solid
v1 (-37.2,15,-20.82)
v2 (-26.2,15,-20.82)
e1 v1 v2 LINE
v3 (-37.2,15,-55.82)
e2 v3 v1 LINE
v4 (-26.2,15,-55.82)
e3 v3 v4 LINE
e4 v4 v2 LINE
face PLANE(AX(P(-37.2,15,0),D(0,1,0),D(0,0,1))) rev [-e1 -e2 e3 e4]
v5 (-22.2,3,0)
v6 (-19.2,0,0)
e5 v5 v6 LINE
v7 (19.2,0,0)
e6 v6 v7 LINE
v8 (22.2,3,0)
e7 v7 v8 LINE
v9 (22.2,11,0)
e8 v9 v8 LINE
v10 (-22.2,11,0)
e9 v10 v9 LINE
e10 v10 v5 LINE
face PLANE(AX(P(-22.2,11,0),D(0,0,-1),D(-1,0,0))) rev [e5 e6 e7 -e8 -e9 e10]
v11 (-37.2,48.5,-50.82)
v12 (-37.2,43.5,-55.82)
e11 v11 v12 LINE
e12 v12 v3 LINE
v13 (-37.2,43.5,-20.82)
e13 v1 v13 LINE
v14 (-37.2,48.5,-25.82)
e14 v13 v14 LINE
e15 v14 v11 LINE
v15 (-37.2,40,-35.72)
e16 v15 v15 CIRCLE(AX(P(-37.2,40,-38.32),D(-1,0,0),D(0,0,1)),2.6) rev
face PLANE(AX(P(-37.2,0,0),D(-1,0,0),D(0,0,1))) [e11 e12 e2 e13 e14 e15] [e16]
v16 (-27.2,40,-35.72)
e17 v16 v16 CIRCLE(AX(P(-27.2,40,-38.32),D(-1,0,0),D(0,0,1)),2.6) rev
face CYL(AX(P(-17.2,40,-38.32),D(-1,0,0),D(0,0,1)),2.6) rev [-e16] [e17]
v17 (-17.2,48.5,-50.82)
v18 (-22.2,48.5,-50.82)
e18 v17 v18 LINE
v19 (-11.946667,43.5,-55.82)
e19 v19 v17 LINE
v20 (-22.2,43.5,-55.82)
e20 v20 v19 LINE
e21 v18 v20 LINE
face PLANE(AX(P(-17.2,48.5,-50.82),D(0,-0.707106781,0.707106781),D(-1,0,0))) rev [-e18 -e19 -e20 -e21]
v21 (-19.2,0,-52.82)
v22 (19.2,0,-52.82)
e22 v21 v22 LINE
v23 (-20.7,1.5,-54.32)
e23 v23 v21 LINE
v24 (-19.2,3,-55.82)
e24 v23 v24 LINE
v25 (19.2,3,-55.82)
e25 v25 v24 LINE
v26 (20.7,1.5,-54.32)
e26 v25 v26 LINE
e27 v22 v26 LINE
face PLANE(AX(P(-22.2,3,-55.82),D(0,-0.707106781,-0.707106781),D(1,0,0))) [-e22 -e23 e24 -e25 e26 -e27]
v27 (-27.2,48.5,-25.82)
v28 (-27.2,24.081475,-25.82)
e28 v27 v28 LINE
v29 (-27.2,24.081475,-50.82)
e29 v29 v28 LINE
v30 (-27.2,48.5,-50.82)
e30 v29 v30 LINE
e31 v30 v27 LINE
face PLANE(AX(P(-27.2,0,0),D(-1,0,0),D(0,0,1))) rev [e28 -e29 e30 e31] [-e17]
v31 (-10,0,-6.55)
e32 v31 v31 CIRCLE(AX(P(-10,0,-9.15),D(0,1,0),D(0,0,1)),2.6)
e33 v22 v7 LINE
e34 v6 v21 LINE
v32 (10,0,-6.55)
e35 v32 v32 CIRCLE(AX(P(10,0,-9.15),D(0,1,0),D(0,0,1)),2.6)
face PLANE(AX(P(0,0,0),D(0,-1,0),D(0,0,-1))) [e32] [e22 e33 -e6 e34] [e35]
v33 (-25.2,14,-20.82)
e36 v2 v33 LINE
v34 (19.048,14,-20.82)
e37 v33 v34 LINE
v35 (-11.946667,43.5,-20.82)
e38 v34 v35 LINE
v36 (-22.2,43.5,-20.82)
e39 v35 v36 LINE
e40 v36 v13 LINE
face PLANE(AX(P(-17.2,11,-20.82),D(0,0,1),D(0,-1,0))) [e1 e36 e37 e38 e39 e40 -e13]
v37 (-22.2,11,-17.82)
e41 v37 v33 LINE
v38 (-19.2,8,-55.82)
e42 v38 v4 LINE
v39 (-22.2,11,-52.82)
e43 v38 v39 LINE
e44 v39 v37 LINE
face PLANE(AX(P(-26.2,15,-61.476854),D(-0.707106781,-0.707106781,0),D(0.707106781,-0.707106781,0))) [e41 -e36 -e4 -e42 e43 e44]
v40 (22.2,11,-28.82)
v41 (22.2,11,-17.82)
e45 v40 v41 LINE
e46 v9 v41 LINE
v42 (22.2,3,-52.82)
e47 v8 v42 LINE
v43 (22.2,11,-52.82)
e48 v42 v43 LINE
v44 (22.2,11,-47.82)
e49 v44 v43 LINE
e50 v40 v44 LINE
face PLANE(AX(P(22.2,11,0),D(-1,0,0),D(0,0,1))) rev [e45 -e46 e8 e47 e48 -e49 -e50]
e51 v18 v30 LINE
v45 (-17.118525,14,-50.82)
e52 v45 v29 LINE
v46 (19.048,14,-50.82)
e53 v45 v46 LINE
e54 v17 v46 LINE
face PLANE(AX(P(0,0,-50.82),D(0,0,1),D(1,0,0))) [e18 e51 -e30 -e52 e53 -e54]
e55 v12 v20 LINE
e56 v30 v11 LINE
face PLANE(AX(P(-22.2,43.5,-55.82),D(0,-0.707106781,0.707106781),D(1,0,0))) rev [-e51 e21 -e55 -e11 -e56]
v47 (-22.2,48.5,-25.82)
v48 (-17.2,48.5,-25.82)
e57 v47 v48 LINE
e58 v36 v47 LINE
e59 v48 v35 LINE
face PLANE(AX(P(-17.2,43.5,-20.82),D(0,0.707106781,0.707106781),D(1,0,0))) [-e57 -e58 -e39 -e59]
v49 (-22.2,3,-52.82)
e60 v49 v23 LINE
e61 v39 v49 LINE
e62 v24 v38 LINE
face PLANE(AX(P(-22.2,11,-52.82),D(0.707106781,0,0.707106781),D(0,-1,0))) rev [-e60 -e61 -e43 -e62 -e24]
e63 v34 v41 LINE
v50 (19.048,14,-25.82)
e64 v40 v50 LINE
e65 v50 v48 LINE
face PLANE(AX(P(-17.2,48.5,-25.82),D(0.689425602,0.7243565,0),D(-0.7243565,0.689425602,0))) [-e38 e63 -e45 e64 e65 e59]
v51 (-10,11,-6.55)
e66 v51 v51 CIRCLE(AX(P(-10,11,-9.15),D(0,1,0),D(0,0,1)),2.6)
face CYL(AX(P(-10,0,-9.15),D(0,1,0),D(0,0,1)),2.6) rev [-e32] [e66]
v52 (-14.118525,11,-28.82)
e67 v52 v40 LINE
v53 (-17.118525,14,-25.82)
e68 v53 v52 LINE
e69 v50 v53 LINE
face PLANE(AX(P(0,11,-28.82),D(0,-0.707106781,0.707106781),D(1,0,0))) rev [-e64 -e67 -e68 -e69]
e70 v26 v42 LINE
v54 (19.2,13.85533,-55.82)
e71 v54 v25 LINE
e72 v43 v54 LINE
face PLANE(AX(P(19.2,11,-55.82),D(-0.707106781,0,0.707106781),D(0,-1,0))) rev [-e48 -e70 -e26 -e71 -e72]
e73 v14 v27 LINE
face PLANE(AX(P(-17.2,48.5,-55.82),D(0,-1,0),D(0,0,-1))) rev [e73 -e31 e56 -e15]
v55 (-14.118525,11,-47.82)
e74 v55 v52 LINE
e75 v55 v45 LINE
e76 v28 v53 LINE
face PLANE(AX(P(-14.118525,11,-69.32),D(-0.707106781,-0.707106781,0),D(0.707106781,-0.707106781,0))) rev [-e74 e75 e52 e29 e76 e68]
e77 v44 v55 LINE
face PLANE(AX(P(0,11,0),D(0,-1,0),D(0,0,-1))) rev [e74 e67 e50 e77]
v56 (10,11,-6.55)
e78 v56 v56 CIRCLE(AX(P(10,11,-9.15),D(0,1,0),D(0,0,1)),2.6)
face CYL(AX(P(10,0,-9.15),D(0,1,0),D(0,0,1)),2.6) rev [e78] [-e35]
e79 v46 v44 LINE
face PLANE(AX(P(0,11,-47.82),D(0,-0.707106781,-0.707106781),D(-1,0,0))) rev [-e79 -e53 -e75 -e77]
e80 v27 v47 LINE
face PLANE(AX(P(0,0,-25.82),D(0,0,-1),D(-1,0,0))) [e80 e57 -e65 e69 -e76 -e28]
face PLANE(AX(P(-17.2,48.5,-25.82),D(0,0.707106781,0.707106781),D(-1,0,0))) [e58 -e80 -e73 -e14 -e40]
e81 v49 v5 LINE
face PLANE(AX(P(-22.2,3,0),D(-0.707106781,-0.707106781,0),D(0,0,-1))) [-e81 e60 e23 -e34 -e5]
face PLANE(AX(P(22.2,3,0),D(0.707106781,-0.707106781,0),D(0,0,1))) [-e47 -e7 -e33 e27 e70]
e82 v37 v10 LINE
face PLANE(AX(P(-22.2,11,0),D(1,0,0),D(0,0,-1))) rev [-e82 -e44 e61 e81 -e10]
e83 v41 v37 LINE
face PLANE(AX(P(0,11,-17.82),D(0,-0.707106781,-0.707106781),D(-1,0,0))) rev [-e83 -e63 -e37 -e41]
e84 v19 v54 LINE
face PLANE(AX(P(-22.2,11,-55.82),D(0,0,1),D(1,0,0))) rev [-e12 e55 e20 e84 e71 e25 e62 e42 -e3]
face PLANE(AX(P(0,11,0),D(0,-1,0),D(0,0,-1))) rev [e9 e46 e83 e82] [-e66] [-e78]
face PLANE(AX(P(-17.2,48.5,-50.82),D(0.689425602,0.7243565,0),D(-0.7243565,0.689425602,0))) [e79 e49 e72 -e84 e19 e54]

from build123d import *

# Parameters (mm, degrees)
SKETCH2_W                = 44.4
SKETCH2_H                = 55.82
BOSS_EXTRUDE1_DEPTH      = 11
CHAMFER1_SIZE            = 3
SKETCH3_R                = 2.6
CUT_EXTRUDE1_DEPTH       = 62.071371362
SKETCH4_W                = 35
SKETCH4_H                = 37.5
SKETCH4_R                = 2.6
BOSS_EXTRUDE2_DEPTH      = 5
BOSS_EXTRUDE7_DEPTH      = 5
BOSS_EXTRUDE9_DEPTH      = 5
CHAMFER8_SIZE            = 5
BOSS_EXTRUDE11_OUTLINE_W = 35
BOSS_EXTRUDE11_OUTLINE_H = 33.5
BOSS_EXTRUDE11_OUTLINE_R = 2.6
BOSS_EXTRUDE11_DEPTH     = 15
CHAMFER10_SIZE           = 5
SKETCH13_W               = 25
SKETCH13_H               = 34.5
CUT_EXTRUDE2_DEPTH       = 10
BOSS_EXTRUDE12_REACH     = 72.435
BOSS_EXTRUDE13_DEPTH     = 25
CHAMFER11_SIZE           = 3


# Read off the part's stored shape, not the designer's step: Boss-Extrude11
# Some blends are built 0.0001 mm under size
with BuildPart() as part:
    # Sketch2 → Boss-Extrude1 (new body)
    with BuildSketch(Plane(origin=(0, 0, 0), x_dir=(1, 0, 0), z_dir=(0, 1, 0))):
        with Locations((0, 27.91)):
            Rectangle(SKETCH2_W, SKETCH2_H)
    extrude(amount=BOSS_EXTRUDE1_DEPTH)

    # Chamfer1
    chamfer1_edges = [part.edges().sort_by_distance(p)[0] for p in [
        (22.2, 0, -27.91),
        (-22.2, 0, -27.91),
    ]]
    chamfer(chamfer1_edges, length=CHAMFER1_SIZE)

    # Sketch3 → Cut-Extrude1 (cut, through all)
    with BuildSketch(Plane(origin=(0, 11, 0), x_dir=(1, 0, 0), z_dir=(0, 1, 0))):
        with Locations(Location((10, 9.15, 0), (0, 0, 270))):
            Circle(SKETCH3_R)
        with Locations(Location((-10, 9.15, 0), (0, 0, 270))):
            Circle(SKETCH3_R)
    extrude(amount=-CUT_EXTRUDE1_DEPTH, mode=Mode.SUBTRACT)

    # Sketch4 → Boss-Extrude2 (add)
    with BuildSketch(Plane.ZY.offset(22.2)):
        with Locations((-38.32, 29.75)):
            Rectangle(SKETCH4_W, SKETCH4_H)
        with Locations((-38.32, 40)):
            Circle(SKETCH4_R, mode=Mode.SUBTRACT)
    extrude(amount=-BOSS_EXTRUDE2_DEPTH)

    # Sketch8 → Boss-Extrude7 (add)
    with BuildSketch(Plane(origin=(0, 0, -55.82), x_dir=(-1, 0, 0), z_dir=(0, 0, -1))):
        Polygon((-22.2, 11), (22.2, 11), (22.2, 48.5), (17.2, 48.5), align=None)
    extrude(amount=-BOSS_EXTRUDE7_DEPTH)

    # Sketch9 → Boss-Extrude9 (add)
    with BuildSketch(Plane.XY.offset(-20.82)):
        Polygon((-22.2, 11), (-22.2, 48.5), (-17.2, 48.5), (22.2, 11), align=None)
    extrude(amount=-BOSS_EXTRUDE9_DEPTH)

    # Chamfer8
    chamfer8_edges = [part.edges().sort_by_distance(p)[0] for p in [
        (-19.7, 48.5, -20.82),
        (-19.7, 48.5, -55.82),
    ]]
    chamfer(chamfer8_edges, length=CHAMFER8_SIZE)

    # Boss-Extrude11 outline → Boss-Extrude11 (add)
    with BuildSketch(Plane.ZY.offset(22.2)):
        with Locations((-38.32, 31.75)):
            Rectangle(BOSS_EXTRUDE11_OUTLINE_W, BOSS_EXTRUDE11_OUTLINE_H)
        with Locations((-38.32, 40)):
            Circle(BOSS_EXTRUDE11_OUTLINE_R, mode=Mode.SUBTRACT)
    extrude(amount=BOSS_EXTRUDE11_DEPTH)

    # Chamfer10
    chamfer10_edges = [part.edges().sort_by_distance(p)[0] for p in [
        (-29.7, 48.5, -20.82),
        (-29.7, 48.5, -55.82),
    ]]
    chamfer(chamfer10_edges, length=CHAMFER10_SIZE - 0.0001)  # a hair under: the kernel refuses the full size

    # Sketch13 → Cut-Extrude2 (cut)
    with BuildSketch(Plane(origin=(-17.2, 0, 0), x_dir=(0, 0, -1), z_dir=(1, 0, 0))):
        with Locations((38.32, 31.25)):
            Rectangle(SKETCH13_W, SKETCH13_H)
    extrude(amount=-CUT_EXTRUDE2_DEPTH, mode=Mode.SUBTRACT)

    # Boss-Extrude12: up to this face of the body (flat: up to its plane)
    boss_extrude12_end = Plane(part.part.faces().sort_by_distance((-10.417387127, 20.265645238, -55.82))[0])
    # Sketch14 → Boss-Extrude12 (add, up to the picked face)
    with BuildSketch(Plane.XY.offset(-20.82), mode=Mode.PRIVATE) as boss_extrude12_sk1:
        Polygon((-22.2, 15), (-26.2, 15), (-22.2, 11), align=None)
    boss_extrude12_tool1 = split(extrude(boss_extrude12_sk1.sketch, amount=-BOSS_EXTRUDE12_REACH, mode=Mode.PRIVATE), bisect_by=boss_extrude12_end, keep=Keep.BOTH, mode=Mode.PRIVATE)
    add(boss_extrude12_tool1.solids().sort_by(Axis((-23.533333, 13.666667, -20.82), (0, 0, -1)))[0])

    # Sketch15 → Boss-Extrude13 (add)
    with BuildSketch(Plane(origin=(0, 0, -25.82), x_dir=(-1, 0, 0), z_dir=(0, 0, -1))):
        Polygon((14.118524548, 11), (27.2, 24.081475452), (27.2, 15), (22.2, 15), (22.2, 11), align=None)
    extrude(amount=BOSS_EXTRUDE13_DEPTH)

    # Chamfer11
    # the kernel refuses this chamfer: 3 mm, written as the material it adds along each edge
    with BuildSketch(Plane(origin=(22.2, 11, -50.82), x_dir=(0, 0.9996219169112968, -0.027495876610589085), z_dir=(-1, 0, 0))) as chamfer11_piece_1_section:
        Polygon((CHAMFER11_SIZE * 0.999621916911, -CHAMFER11_SIZE * 0.0274958766106), (-CHAMFER11_SIZE * 0.0274958766106, -CHAMFER11_SIZE * 0.999621916911), (0, 0), align=None)
    chamfer11_piece_1 = extrude(amount=44.033573512, mode=Mode.PRIVATE)
    chamfer11_piece_1 = split(chamfer11_piece_1, bisect_by=Plane(origin=(11.645849557, 21.045193949, -49.830255653), z_dir=(-0.689425602489498, -0.7243564996822992, 0)), keep=Keep.TOP, mode=Mode.PRIVATE)
    add(chamfer11_piece_1)
    with BuildSketch(Plane(origin=(22.2, 11, -25.82), x_dir=(0, -0.027495876610589064, -0.9996219169112965), z_dir=(-1, 0, 0))) as chamfer11_piece_2_section:
        Polygon((CHAMFER11_SIZE * 0.999621916911, -CHAMFER11_SIZE * 0.0274958766106), (-CHAMFER11_SIZE * 0.0274958766106, -CHAMFER11_SIZE * 0.999621916911), (0, 0), align=None)
    chamfer11_piece_2 = extrude(amount=44.033573512, mode=Mode.PRIVATE)
    chamfer11_piece_2 = split(chamfer11_piece_2, bisect_by=Plane(origin=(11.645849557, 21.045193949, -26.809744347), z_dir=(-0.6894256024894981, -0.7243564996822992, 0)), keep=Keep.TOP, mode=Mode.PRIVATE)
    add(chamfer11_piece_2)
    with BuildSketch(Plane(origin=(22.2, 11, -20.82), x_dir=(0, 0.9996219169112968, -0.027495876610587933), z_dir=(-1, 0, 0))) as chamfer11_piece_3_section:
        Polygon((CHAMFER11_SIZE * 0.999621916911, -CHAMFER11_SIZE * 0.0274958766106), (-CHAMFER11_SIZE * 0.0274958766106, -CHAMFER11_SIZE * 0.999621916911), (0, 0), align=None)
    chamfer11_piece_3 = extrude(amount=44.4, mode=Mode.PRIVATE)
    chamfer11_piece_3 = split(chamfer11_piece_3, bisect_by=Plane(origin=(9.795664895, 22.806156509, -19.82331844), z_dir=(-0.6894256024894981, -0.7243564996822992, 0)), keep=Keep.TOP, mode=Mode.PRIVATE)
    chamfer11_piece_3 = split(chamfer11_piece_3, bisect_by=Plane(origin=(-11.844103609, 0.644103609, -19.82331844), z_dir=(0.7071067811865474, 0.7071067811865477, 0)), keep=Keep.TOP, mode=Mode.PRIVATE)
    add(chamfer11_piece_3)
    with BuildSketch(Plane(origin=(22.2, 11, -20.82), x_dir=(0, 0.9996219169112968, -0.027495876610587933), z_dir=(-1, 0, 0))) as chamfer11_piece_4_section:
        Polygon((CHAMFER11_SIZE * 0.999621916911, -CHAMFER11_SIZE * 0.0274958766106), (-CHAMFER11_SIZE * 0.0274958766106, -CHAMFER11_SIZE * 0.999621916911), (0, 0), align=None)
    chamfer11_piece_4 = extrude(amount=52.115048964, mode=Mode.PRIVATE)
    chamfer11_piece_4 = split(chamfer11_piece_4, bisect_by=Plane(origin=(-23.372890722, 12.172890722, -20.136626916), z_dir=(0.7071067811865474, 0.7071067811865477, 0)), keep=Keep.TOP, mode=Mode.PRIVATE)
    chamfer11_piece_4 = split(chamfer11_piece_4, bisect_by=Plane(origin=(-22.2, 12.563854296, -20.136626916), z_dir=(-1, 0, 0)), keep=Keep.TOP, mode=Mode.PRIVATE)
    add(chamfer11_piece_4)
    # the kernel refuses this chamfer: 3 mm, written as the material it takes off along each edge
    with BuildSketch(Plane(origin=(-22.2, 18.715048964, -55.82), x_dir=(0.9996219169112965, 0, -0.02749587661058676), z_dir=(0, -1, 0))) as chamfer11_2_piece_1_section:
        Polygon((CHAMFER11_SIZE * 0.999621916911, CHAMFER11_SIZE * 0.0274958766106), (-CHAMFER11_SIZE * 0.0274958766106, CHAMFER11_SIZE * 0.999621916911), (0, 0), align=None)
    chamfer11_2_piece_1 = extrude(amount=23.430097928, mode=Mode.PRIVATE)
    chamfer11_2_piece_1 = split(chamfer11_2_piece_1, bisect_by=Plane(origin=(-17.558310603, 6.358310603, -54.809870411), z_dir=(-0.7071067811865474, -0.7071067811865477, 0)), keep=Keep.TOP, mode=Mode.PRIVATE)
    add(chamfer11_2_piece_1, mode=Mode.SUBTRACT)
    with BuildSketch(Plane(origin=(22.2, -4.715048964, -55.82), x_dir=(-0.9996219169112965, 0, -0.02749587661058676), z_dir=(0, 1, 0))) as chamfer11_2_piece_2:
        Polygon((CHAMFER11_SIZE * 0.999621916911, CHAMFER11_SIZE * 0.0274958766106), (-CHAMFER11_SIZE * 0.0274958766106, CHAMFER11_SIZE * 0.999621916911), (0, 0), align=None)
    extrude(amount=23.430097928, mode=Mode.SUBTRACT)
    with BuildSketch(Plane(origin=(26.915048964, 0, -55.82), x_dir=(0, 0.9996219169112968, -0.027495876610586778), z_dir=(-1, 0, 0))) as chamfer11_2_piece_3:
        Polygon((CHAMFER11_SIZE * 0.999621916911, -CHAMFER11_SIZE * 0.0274958766106), (-CHAMFER11_SIZE * 0.0274958766106, -CHAMFER11_SIZE * 0.999621916911), (0, 0), align=None)
    extrude(amount=53.830097928, mode=Mode.SUBTRACT)


solid = part.part
